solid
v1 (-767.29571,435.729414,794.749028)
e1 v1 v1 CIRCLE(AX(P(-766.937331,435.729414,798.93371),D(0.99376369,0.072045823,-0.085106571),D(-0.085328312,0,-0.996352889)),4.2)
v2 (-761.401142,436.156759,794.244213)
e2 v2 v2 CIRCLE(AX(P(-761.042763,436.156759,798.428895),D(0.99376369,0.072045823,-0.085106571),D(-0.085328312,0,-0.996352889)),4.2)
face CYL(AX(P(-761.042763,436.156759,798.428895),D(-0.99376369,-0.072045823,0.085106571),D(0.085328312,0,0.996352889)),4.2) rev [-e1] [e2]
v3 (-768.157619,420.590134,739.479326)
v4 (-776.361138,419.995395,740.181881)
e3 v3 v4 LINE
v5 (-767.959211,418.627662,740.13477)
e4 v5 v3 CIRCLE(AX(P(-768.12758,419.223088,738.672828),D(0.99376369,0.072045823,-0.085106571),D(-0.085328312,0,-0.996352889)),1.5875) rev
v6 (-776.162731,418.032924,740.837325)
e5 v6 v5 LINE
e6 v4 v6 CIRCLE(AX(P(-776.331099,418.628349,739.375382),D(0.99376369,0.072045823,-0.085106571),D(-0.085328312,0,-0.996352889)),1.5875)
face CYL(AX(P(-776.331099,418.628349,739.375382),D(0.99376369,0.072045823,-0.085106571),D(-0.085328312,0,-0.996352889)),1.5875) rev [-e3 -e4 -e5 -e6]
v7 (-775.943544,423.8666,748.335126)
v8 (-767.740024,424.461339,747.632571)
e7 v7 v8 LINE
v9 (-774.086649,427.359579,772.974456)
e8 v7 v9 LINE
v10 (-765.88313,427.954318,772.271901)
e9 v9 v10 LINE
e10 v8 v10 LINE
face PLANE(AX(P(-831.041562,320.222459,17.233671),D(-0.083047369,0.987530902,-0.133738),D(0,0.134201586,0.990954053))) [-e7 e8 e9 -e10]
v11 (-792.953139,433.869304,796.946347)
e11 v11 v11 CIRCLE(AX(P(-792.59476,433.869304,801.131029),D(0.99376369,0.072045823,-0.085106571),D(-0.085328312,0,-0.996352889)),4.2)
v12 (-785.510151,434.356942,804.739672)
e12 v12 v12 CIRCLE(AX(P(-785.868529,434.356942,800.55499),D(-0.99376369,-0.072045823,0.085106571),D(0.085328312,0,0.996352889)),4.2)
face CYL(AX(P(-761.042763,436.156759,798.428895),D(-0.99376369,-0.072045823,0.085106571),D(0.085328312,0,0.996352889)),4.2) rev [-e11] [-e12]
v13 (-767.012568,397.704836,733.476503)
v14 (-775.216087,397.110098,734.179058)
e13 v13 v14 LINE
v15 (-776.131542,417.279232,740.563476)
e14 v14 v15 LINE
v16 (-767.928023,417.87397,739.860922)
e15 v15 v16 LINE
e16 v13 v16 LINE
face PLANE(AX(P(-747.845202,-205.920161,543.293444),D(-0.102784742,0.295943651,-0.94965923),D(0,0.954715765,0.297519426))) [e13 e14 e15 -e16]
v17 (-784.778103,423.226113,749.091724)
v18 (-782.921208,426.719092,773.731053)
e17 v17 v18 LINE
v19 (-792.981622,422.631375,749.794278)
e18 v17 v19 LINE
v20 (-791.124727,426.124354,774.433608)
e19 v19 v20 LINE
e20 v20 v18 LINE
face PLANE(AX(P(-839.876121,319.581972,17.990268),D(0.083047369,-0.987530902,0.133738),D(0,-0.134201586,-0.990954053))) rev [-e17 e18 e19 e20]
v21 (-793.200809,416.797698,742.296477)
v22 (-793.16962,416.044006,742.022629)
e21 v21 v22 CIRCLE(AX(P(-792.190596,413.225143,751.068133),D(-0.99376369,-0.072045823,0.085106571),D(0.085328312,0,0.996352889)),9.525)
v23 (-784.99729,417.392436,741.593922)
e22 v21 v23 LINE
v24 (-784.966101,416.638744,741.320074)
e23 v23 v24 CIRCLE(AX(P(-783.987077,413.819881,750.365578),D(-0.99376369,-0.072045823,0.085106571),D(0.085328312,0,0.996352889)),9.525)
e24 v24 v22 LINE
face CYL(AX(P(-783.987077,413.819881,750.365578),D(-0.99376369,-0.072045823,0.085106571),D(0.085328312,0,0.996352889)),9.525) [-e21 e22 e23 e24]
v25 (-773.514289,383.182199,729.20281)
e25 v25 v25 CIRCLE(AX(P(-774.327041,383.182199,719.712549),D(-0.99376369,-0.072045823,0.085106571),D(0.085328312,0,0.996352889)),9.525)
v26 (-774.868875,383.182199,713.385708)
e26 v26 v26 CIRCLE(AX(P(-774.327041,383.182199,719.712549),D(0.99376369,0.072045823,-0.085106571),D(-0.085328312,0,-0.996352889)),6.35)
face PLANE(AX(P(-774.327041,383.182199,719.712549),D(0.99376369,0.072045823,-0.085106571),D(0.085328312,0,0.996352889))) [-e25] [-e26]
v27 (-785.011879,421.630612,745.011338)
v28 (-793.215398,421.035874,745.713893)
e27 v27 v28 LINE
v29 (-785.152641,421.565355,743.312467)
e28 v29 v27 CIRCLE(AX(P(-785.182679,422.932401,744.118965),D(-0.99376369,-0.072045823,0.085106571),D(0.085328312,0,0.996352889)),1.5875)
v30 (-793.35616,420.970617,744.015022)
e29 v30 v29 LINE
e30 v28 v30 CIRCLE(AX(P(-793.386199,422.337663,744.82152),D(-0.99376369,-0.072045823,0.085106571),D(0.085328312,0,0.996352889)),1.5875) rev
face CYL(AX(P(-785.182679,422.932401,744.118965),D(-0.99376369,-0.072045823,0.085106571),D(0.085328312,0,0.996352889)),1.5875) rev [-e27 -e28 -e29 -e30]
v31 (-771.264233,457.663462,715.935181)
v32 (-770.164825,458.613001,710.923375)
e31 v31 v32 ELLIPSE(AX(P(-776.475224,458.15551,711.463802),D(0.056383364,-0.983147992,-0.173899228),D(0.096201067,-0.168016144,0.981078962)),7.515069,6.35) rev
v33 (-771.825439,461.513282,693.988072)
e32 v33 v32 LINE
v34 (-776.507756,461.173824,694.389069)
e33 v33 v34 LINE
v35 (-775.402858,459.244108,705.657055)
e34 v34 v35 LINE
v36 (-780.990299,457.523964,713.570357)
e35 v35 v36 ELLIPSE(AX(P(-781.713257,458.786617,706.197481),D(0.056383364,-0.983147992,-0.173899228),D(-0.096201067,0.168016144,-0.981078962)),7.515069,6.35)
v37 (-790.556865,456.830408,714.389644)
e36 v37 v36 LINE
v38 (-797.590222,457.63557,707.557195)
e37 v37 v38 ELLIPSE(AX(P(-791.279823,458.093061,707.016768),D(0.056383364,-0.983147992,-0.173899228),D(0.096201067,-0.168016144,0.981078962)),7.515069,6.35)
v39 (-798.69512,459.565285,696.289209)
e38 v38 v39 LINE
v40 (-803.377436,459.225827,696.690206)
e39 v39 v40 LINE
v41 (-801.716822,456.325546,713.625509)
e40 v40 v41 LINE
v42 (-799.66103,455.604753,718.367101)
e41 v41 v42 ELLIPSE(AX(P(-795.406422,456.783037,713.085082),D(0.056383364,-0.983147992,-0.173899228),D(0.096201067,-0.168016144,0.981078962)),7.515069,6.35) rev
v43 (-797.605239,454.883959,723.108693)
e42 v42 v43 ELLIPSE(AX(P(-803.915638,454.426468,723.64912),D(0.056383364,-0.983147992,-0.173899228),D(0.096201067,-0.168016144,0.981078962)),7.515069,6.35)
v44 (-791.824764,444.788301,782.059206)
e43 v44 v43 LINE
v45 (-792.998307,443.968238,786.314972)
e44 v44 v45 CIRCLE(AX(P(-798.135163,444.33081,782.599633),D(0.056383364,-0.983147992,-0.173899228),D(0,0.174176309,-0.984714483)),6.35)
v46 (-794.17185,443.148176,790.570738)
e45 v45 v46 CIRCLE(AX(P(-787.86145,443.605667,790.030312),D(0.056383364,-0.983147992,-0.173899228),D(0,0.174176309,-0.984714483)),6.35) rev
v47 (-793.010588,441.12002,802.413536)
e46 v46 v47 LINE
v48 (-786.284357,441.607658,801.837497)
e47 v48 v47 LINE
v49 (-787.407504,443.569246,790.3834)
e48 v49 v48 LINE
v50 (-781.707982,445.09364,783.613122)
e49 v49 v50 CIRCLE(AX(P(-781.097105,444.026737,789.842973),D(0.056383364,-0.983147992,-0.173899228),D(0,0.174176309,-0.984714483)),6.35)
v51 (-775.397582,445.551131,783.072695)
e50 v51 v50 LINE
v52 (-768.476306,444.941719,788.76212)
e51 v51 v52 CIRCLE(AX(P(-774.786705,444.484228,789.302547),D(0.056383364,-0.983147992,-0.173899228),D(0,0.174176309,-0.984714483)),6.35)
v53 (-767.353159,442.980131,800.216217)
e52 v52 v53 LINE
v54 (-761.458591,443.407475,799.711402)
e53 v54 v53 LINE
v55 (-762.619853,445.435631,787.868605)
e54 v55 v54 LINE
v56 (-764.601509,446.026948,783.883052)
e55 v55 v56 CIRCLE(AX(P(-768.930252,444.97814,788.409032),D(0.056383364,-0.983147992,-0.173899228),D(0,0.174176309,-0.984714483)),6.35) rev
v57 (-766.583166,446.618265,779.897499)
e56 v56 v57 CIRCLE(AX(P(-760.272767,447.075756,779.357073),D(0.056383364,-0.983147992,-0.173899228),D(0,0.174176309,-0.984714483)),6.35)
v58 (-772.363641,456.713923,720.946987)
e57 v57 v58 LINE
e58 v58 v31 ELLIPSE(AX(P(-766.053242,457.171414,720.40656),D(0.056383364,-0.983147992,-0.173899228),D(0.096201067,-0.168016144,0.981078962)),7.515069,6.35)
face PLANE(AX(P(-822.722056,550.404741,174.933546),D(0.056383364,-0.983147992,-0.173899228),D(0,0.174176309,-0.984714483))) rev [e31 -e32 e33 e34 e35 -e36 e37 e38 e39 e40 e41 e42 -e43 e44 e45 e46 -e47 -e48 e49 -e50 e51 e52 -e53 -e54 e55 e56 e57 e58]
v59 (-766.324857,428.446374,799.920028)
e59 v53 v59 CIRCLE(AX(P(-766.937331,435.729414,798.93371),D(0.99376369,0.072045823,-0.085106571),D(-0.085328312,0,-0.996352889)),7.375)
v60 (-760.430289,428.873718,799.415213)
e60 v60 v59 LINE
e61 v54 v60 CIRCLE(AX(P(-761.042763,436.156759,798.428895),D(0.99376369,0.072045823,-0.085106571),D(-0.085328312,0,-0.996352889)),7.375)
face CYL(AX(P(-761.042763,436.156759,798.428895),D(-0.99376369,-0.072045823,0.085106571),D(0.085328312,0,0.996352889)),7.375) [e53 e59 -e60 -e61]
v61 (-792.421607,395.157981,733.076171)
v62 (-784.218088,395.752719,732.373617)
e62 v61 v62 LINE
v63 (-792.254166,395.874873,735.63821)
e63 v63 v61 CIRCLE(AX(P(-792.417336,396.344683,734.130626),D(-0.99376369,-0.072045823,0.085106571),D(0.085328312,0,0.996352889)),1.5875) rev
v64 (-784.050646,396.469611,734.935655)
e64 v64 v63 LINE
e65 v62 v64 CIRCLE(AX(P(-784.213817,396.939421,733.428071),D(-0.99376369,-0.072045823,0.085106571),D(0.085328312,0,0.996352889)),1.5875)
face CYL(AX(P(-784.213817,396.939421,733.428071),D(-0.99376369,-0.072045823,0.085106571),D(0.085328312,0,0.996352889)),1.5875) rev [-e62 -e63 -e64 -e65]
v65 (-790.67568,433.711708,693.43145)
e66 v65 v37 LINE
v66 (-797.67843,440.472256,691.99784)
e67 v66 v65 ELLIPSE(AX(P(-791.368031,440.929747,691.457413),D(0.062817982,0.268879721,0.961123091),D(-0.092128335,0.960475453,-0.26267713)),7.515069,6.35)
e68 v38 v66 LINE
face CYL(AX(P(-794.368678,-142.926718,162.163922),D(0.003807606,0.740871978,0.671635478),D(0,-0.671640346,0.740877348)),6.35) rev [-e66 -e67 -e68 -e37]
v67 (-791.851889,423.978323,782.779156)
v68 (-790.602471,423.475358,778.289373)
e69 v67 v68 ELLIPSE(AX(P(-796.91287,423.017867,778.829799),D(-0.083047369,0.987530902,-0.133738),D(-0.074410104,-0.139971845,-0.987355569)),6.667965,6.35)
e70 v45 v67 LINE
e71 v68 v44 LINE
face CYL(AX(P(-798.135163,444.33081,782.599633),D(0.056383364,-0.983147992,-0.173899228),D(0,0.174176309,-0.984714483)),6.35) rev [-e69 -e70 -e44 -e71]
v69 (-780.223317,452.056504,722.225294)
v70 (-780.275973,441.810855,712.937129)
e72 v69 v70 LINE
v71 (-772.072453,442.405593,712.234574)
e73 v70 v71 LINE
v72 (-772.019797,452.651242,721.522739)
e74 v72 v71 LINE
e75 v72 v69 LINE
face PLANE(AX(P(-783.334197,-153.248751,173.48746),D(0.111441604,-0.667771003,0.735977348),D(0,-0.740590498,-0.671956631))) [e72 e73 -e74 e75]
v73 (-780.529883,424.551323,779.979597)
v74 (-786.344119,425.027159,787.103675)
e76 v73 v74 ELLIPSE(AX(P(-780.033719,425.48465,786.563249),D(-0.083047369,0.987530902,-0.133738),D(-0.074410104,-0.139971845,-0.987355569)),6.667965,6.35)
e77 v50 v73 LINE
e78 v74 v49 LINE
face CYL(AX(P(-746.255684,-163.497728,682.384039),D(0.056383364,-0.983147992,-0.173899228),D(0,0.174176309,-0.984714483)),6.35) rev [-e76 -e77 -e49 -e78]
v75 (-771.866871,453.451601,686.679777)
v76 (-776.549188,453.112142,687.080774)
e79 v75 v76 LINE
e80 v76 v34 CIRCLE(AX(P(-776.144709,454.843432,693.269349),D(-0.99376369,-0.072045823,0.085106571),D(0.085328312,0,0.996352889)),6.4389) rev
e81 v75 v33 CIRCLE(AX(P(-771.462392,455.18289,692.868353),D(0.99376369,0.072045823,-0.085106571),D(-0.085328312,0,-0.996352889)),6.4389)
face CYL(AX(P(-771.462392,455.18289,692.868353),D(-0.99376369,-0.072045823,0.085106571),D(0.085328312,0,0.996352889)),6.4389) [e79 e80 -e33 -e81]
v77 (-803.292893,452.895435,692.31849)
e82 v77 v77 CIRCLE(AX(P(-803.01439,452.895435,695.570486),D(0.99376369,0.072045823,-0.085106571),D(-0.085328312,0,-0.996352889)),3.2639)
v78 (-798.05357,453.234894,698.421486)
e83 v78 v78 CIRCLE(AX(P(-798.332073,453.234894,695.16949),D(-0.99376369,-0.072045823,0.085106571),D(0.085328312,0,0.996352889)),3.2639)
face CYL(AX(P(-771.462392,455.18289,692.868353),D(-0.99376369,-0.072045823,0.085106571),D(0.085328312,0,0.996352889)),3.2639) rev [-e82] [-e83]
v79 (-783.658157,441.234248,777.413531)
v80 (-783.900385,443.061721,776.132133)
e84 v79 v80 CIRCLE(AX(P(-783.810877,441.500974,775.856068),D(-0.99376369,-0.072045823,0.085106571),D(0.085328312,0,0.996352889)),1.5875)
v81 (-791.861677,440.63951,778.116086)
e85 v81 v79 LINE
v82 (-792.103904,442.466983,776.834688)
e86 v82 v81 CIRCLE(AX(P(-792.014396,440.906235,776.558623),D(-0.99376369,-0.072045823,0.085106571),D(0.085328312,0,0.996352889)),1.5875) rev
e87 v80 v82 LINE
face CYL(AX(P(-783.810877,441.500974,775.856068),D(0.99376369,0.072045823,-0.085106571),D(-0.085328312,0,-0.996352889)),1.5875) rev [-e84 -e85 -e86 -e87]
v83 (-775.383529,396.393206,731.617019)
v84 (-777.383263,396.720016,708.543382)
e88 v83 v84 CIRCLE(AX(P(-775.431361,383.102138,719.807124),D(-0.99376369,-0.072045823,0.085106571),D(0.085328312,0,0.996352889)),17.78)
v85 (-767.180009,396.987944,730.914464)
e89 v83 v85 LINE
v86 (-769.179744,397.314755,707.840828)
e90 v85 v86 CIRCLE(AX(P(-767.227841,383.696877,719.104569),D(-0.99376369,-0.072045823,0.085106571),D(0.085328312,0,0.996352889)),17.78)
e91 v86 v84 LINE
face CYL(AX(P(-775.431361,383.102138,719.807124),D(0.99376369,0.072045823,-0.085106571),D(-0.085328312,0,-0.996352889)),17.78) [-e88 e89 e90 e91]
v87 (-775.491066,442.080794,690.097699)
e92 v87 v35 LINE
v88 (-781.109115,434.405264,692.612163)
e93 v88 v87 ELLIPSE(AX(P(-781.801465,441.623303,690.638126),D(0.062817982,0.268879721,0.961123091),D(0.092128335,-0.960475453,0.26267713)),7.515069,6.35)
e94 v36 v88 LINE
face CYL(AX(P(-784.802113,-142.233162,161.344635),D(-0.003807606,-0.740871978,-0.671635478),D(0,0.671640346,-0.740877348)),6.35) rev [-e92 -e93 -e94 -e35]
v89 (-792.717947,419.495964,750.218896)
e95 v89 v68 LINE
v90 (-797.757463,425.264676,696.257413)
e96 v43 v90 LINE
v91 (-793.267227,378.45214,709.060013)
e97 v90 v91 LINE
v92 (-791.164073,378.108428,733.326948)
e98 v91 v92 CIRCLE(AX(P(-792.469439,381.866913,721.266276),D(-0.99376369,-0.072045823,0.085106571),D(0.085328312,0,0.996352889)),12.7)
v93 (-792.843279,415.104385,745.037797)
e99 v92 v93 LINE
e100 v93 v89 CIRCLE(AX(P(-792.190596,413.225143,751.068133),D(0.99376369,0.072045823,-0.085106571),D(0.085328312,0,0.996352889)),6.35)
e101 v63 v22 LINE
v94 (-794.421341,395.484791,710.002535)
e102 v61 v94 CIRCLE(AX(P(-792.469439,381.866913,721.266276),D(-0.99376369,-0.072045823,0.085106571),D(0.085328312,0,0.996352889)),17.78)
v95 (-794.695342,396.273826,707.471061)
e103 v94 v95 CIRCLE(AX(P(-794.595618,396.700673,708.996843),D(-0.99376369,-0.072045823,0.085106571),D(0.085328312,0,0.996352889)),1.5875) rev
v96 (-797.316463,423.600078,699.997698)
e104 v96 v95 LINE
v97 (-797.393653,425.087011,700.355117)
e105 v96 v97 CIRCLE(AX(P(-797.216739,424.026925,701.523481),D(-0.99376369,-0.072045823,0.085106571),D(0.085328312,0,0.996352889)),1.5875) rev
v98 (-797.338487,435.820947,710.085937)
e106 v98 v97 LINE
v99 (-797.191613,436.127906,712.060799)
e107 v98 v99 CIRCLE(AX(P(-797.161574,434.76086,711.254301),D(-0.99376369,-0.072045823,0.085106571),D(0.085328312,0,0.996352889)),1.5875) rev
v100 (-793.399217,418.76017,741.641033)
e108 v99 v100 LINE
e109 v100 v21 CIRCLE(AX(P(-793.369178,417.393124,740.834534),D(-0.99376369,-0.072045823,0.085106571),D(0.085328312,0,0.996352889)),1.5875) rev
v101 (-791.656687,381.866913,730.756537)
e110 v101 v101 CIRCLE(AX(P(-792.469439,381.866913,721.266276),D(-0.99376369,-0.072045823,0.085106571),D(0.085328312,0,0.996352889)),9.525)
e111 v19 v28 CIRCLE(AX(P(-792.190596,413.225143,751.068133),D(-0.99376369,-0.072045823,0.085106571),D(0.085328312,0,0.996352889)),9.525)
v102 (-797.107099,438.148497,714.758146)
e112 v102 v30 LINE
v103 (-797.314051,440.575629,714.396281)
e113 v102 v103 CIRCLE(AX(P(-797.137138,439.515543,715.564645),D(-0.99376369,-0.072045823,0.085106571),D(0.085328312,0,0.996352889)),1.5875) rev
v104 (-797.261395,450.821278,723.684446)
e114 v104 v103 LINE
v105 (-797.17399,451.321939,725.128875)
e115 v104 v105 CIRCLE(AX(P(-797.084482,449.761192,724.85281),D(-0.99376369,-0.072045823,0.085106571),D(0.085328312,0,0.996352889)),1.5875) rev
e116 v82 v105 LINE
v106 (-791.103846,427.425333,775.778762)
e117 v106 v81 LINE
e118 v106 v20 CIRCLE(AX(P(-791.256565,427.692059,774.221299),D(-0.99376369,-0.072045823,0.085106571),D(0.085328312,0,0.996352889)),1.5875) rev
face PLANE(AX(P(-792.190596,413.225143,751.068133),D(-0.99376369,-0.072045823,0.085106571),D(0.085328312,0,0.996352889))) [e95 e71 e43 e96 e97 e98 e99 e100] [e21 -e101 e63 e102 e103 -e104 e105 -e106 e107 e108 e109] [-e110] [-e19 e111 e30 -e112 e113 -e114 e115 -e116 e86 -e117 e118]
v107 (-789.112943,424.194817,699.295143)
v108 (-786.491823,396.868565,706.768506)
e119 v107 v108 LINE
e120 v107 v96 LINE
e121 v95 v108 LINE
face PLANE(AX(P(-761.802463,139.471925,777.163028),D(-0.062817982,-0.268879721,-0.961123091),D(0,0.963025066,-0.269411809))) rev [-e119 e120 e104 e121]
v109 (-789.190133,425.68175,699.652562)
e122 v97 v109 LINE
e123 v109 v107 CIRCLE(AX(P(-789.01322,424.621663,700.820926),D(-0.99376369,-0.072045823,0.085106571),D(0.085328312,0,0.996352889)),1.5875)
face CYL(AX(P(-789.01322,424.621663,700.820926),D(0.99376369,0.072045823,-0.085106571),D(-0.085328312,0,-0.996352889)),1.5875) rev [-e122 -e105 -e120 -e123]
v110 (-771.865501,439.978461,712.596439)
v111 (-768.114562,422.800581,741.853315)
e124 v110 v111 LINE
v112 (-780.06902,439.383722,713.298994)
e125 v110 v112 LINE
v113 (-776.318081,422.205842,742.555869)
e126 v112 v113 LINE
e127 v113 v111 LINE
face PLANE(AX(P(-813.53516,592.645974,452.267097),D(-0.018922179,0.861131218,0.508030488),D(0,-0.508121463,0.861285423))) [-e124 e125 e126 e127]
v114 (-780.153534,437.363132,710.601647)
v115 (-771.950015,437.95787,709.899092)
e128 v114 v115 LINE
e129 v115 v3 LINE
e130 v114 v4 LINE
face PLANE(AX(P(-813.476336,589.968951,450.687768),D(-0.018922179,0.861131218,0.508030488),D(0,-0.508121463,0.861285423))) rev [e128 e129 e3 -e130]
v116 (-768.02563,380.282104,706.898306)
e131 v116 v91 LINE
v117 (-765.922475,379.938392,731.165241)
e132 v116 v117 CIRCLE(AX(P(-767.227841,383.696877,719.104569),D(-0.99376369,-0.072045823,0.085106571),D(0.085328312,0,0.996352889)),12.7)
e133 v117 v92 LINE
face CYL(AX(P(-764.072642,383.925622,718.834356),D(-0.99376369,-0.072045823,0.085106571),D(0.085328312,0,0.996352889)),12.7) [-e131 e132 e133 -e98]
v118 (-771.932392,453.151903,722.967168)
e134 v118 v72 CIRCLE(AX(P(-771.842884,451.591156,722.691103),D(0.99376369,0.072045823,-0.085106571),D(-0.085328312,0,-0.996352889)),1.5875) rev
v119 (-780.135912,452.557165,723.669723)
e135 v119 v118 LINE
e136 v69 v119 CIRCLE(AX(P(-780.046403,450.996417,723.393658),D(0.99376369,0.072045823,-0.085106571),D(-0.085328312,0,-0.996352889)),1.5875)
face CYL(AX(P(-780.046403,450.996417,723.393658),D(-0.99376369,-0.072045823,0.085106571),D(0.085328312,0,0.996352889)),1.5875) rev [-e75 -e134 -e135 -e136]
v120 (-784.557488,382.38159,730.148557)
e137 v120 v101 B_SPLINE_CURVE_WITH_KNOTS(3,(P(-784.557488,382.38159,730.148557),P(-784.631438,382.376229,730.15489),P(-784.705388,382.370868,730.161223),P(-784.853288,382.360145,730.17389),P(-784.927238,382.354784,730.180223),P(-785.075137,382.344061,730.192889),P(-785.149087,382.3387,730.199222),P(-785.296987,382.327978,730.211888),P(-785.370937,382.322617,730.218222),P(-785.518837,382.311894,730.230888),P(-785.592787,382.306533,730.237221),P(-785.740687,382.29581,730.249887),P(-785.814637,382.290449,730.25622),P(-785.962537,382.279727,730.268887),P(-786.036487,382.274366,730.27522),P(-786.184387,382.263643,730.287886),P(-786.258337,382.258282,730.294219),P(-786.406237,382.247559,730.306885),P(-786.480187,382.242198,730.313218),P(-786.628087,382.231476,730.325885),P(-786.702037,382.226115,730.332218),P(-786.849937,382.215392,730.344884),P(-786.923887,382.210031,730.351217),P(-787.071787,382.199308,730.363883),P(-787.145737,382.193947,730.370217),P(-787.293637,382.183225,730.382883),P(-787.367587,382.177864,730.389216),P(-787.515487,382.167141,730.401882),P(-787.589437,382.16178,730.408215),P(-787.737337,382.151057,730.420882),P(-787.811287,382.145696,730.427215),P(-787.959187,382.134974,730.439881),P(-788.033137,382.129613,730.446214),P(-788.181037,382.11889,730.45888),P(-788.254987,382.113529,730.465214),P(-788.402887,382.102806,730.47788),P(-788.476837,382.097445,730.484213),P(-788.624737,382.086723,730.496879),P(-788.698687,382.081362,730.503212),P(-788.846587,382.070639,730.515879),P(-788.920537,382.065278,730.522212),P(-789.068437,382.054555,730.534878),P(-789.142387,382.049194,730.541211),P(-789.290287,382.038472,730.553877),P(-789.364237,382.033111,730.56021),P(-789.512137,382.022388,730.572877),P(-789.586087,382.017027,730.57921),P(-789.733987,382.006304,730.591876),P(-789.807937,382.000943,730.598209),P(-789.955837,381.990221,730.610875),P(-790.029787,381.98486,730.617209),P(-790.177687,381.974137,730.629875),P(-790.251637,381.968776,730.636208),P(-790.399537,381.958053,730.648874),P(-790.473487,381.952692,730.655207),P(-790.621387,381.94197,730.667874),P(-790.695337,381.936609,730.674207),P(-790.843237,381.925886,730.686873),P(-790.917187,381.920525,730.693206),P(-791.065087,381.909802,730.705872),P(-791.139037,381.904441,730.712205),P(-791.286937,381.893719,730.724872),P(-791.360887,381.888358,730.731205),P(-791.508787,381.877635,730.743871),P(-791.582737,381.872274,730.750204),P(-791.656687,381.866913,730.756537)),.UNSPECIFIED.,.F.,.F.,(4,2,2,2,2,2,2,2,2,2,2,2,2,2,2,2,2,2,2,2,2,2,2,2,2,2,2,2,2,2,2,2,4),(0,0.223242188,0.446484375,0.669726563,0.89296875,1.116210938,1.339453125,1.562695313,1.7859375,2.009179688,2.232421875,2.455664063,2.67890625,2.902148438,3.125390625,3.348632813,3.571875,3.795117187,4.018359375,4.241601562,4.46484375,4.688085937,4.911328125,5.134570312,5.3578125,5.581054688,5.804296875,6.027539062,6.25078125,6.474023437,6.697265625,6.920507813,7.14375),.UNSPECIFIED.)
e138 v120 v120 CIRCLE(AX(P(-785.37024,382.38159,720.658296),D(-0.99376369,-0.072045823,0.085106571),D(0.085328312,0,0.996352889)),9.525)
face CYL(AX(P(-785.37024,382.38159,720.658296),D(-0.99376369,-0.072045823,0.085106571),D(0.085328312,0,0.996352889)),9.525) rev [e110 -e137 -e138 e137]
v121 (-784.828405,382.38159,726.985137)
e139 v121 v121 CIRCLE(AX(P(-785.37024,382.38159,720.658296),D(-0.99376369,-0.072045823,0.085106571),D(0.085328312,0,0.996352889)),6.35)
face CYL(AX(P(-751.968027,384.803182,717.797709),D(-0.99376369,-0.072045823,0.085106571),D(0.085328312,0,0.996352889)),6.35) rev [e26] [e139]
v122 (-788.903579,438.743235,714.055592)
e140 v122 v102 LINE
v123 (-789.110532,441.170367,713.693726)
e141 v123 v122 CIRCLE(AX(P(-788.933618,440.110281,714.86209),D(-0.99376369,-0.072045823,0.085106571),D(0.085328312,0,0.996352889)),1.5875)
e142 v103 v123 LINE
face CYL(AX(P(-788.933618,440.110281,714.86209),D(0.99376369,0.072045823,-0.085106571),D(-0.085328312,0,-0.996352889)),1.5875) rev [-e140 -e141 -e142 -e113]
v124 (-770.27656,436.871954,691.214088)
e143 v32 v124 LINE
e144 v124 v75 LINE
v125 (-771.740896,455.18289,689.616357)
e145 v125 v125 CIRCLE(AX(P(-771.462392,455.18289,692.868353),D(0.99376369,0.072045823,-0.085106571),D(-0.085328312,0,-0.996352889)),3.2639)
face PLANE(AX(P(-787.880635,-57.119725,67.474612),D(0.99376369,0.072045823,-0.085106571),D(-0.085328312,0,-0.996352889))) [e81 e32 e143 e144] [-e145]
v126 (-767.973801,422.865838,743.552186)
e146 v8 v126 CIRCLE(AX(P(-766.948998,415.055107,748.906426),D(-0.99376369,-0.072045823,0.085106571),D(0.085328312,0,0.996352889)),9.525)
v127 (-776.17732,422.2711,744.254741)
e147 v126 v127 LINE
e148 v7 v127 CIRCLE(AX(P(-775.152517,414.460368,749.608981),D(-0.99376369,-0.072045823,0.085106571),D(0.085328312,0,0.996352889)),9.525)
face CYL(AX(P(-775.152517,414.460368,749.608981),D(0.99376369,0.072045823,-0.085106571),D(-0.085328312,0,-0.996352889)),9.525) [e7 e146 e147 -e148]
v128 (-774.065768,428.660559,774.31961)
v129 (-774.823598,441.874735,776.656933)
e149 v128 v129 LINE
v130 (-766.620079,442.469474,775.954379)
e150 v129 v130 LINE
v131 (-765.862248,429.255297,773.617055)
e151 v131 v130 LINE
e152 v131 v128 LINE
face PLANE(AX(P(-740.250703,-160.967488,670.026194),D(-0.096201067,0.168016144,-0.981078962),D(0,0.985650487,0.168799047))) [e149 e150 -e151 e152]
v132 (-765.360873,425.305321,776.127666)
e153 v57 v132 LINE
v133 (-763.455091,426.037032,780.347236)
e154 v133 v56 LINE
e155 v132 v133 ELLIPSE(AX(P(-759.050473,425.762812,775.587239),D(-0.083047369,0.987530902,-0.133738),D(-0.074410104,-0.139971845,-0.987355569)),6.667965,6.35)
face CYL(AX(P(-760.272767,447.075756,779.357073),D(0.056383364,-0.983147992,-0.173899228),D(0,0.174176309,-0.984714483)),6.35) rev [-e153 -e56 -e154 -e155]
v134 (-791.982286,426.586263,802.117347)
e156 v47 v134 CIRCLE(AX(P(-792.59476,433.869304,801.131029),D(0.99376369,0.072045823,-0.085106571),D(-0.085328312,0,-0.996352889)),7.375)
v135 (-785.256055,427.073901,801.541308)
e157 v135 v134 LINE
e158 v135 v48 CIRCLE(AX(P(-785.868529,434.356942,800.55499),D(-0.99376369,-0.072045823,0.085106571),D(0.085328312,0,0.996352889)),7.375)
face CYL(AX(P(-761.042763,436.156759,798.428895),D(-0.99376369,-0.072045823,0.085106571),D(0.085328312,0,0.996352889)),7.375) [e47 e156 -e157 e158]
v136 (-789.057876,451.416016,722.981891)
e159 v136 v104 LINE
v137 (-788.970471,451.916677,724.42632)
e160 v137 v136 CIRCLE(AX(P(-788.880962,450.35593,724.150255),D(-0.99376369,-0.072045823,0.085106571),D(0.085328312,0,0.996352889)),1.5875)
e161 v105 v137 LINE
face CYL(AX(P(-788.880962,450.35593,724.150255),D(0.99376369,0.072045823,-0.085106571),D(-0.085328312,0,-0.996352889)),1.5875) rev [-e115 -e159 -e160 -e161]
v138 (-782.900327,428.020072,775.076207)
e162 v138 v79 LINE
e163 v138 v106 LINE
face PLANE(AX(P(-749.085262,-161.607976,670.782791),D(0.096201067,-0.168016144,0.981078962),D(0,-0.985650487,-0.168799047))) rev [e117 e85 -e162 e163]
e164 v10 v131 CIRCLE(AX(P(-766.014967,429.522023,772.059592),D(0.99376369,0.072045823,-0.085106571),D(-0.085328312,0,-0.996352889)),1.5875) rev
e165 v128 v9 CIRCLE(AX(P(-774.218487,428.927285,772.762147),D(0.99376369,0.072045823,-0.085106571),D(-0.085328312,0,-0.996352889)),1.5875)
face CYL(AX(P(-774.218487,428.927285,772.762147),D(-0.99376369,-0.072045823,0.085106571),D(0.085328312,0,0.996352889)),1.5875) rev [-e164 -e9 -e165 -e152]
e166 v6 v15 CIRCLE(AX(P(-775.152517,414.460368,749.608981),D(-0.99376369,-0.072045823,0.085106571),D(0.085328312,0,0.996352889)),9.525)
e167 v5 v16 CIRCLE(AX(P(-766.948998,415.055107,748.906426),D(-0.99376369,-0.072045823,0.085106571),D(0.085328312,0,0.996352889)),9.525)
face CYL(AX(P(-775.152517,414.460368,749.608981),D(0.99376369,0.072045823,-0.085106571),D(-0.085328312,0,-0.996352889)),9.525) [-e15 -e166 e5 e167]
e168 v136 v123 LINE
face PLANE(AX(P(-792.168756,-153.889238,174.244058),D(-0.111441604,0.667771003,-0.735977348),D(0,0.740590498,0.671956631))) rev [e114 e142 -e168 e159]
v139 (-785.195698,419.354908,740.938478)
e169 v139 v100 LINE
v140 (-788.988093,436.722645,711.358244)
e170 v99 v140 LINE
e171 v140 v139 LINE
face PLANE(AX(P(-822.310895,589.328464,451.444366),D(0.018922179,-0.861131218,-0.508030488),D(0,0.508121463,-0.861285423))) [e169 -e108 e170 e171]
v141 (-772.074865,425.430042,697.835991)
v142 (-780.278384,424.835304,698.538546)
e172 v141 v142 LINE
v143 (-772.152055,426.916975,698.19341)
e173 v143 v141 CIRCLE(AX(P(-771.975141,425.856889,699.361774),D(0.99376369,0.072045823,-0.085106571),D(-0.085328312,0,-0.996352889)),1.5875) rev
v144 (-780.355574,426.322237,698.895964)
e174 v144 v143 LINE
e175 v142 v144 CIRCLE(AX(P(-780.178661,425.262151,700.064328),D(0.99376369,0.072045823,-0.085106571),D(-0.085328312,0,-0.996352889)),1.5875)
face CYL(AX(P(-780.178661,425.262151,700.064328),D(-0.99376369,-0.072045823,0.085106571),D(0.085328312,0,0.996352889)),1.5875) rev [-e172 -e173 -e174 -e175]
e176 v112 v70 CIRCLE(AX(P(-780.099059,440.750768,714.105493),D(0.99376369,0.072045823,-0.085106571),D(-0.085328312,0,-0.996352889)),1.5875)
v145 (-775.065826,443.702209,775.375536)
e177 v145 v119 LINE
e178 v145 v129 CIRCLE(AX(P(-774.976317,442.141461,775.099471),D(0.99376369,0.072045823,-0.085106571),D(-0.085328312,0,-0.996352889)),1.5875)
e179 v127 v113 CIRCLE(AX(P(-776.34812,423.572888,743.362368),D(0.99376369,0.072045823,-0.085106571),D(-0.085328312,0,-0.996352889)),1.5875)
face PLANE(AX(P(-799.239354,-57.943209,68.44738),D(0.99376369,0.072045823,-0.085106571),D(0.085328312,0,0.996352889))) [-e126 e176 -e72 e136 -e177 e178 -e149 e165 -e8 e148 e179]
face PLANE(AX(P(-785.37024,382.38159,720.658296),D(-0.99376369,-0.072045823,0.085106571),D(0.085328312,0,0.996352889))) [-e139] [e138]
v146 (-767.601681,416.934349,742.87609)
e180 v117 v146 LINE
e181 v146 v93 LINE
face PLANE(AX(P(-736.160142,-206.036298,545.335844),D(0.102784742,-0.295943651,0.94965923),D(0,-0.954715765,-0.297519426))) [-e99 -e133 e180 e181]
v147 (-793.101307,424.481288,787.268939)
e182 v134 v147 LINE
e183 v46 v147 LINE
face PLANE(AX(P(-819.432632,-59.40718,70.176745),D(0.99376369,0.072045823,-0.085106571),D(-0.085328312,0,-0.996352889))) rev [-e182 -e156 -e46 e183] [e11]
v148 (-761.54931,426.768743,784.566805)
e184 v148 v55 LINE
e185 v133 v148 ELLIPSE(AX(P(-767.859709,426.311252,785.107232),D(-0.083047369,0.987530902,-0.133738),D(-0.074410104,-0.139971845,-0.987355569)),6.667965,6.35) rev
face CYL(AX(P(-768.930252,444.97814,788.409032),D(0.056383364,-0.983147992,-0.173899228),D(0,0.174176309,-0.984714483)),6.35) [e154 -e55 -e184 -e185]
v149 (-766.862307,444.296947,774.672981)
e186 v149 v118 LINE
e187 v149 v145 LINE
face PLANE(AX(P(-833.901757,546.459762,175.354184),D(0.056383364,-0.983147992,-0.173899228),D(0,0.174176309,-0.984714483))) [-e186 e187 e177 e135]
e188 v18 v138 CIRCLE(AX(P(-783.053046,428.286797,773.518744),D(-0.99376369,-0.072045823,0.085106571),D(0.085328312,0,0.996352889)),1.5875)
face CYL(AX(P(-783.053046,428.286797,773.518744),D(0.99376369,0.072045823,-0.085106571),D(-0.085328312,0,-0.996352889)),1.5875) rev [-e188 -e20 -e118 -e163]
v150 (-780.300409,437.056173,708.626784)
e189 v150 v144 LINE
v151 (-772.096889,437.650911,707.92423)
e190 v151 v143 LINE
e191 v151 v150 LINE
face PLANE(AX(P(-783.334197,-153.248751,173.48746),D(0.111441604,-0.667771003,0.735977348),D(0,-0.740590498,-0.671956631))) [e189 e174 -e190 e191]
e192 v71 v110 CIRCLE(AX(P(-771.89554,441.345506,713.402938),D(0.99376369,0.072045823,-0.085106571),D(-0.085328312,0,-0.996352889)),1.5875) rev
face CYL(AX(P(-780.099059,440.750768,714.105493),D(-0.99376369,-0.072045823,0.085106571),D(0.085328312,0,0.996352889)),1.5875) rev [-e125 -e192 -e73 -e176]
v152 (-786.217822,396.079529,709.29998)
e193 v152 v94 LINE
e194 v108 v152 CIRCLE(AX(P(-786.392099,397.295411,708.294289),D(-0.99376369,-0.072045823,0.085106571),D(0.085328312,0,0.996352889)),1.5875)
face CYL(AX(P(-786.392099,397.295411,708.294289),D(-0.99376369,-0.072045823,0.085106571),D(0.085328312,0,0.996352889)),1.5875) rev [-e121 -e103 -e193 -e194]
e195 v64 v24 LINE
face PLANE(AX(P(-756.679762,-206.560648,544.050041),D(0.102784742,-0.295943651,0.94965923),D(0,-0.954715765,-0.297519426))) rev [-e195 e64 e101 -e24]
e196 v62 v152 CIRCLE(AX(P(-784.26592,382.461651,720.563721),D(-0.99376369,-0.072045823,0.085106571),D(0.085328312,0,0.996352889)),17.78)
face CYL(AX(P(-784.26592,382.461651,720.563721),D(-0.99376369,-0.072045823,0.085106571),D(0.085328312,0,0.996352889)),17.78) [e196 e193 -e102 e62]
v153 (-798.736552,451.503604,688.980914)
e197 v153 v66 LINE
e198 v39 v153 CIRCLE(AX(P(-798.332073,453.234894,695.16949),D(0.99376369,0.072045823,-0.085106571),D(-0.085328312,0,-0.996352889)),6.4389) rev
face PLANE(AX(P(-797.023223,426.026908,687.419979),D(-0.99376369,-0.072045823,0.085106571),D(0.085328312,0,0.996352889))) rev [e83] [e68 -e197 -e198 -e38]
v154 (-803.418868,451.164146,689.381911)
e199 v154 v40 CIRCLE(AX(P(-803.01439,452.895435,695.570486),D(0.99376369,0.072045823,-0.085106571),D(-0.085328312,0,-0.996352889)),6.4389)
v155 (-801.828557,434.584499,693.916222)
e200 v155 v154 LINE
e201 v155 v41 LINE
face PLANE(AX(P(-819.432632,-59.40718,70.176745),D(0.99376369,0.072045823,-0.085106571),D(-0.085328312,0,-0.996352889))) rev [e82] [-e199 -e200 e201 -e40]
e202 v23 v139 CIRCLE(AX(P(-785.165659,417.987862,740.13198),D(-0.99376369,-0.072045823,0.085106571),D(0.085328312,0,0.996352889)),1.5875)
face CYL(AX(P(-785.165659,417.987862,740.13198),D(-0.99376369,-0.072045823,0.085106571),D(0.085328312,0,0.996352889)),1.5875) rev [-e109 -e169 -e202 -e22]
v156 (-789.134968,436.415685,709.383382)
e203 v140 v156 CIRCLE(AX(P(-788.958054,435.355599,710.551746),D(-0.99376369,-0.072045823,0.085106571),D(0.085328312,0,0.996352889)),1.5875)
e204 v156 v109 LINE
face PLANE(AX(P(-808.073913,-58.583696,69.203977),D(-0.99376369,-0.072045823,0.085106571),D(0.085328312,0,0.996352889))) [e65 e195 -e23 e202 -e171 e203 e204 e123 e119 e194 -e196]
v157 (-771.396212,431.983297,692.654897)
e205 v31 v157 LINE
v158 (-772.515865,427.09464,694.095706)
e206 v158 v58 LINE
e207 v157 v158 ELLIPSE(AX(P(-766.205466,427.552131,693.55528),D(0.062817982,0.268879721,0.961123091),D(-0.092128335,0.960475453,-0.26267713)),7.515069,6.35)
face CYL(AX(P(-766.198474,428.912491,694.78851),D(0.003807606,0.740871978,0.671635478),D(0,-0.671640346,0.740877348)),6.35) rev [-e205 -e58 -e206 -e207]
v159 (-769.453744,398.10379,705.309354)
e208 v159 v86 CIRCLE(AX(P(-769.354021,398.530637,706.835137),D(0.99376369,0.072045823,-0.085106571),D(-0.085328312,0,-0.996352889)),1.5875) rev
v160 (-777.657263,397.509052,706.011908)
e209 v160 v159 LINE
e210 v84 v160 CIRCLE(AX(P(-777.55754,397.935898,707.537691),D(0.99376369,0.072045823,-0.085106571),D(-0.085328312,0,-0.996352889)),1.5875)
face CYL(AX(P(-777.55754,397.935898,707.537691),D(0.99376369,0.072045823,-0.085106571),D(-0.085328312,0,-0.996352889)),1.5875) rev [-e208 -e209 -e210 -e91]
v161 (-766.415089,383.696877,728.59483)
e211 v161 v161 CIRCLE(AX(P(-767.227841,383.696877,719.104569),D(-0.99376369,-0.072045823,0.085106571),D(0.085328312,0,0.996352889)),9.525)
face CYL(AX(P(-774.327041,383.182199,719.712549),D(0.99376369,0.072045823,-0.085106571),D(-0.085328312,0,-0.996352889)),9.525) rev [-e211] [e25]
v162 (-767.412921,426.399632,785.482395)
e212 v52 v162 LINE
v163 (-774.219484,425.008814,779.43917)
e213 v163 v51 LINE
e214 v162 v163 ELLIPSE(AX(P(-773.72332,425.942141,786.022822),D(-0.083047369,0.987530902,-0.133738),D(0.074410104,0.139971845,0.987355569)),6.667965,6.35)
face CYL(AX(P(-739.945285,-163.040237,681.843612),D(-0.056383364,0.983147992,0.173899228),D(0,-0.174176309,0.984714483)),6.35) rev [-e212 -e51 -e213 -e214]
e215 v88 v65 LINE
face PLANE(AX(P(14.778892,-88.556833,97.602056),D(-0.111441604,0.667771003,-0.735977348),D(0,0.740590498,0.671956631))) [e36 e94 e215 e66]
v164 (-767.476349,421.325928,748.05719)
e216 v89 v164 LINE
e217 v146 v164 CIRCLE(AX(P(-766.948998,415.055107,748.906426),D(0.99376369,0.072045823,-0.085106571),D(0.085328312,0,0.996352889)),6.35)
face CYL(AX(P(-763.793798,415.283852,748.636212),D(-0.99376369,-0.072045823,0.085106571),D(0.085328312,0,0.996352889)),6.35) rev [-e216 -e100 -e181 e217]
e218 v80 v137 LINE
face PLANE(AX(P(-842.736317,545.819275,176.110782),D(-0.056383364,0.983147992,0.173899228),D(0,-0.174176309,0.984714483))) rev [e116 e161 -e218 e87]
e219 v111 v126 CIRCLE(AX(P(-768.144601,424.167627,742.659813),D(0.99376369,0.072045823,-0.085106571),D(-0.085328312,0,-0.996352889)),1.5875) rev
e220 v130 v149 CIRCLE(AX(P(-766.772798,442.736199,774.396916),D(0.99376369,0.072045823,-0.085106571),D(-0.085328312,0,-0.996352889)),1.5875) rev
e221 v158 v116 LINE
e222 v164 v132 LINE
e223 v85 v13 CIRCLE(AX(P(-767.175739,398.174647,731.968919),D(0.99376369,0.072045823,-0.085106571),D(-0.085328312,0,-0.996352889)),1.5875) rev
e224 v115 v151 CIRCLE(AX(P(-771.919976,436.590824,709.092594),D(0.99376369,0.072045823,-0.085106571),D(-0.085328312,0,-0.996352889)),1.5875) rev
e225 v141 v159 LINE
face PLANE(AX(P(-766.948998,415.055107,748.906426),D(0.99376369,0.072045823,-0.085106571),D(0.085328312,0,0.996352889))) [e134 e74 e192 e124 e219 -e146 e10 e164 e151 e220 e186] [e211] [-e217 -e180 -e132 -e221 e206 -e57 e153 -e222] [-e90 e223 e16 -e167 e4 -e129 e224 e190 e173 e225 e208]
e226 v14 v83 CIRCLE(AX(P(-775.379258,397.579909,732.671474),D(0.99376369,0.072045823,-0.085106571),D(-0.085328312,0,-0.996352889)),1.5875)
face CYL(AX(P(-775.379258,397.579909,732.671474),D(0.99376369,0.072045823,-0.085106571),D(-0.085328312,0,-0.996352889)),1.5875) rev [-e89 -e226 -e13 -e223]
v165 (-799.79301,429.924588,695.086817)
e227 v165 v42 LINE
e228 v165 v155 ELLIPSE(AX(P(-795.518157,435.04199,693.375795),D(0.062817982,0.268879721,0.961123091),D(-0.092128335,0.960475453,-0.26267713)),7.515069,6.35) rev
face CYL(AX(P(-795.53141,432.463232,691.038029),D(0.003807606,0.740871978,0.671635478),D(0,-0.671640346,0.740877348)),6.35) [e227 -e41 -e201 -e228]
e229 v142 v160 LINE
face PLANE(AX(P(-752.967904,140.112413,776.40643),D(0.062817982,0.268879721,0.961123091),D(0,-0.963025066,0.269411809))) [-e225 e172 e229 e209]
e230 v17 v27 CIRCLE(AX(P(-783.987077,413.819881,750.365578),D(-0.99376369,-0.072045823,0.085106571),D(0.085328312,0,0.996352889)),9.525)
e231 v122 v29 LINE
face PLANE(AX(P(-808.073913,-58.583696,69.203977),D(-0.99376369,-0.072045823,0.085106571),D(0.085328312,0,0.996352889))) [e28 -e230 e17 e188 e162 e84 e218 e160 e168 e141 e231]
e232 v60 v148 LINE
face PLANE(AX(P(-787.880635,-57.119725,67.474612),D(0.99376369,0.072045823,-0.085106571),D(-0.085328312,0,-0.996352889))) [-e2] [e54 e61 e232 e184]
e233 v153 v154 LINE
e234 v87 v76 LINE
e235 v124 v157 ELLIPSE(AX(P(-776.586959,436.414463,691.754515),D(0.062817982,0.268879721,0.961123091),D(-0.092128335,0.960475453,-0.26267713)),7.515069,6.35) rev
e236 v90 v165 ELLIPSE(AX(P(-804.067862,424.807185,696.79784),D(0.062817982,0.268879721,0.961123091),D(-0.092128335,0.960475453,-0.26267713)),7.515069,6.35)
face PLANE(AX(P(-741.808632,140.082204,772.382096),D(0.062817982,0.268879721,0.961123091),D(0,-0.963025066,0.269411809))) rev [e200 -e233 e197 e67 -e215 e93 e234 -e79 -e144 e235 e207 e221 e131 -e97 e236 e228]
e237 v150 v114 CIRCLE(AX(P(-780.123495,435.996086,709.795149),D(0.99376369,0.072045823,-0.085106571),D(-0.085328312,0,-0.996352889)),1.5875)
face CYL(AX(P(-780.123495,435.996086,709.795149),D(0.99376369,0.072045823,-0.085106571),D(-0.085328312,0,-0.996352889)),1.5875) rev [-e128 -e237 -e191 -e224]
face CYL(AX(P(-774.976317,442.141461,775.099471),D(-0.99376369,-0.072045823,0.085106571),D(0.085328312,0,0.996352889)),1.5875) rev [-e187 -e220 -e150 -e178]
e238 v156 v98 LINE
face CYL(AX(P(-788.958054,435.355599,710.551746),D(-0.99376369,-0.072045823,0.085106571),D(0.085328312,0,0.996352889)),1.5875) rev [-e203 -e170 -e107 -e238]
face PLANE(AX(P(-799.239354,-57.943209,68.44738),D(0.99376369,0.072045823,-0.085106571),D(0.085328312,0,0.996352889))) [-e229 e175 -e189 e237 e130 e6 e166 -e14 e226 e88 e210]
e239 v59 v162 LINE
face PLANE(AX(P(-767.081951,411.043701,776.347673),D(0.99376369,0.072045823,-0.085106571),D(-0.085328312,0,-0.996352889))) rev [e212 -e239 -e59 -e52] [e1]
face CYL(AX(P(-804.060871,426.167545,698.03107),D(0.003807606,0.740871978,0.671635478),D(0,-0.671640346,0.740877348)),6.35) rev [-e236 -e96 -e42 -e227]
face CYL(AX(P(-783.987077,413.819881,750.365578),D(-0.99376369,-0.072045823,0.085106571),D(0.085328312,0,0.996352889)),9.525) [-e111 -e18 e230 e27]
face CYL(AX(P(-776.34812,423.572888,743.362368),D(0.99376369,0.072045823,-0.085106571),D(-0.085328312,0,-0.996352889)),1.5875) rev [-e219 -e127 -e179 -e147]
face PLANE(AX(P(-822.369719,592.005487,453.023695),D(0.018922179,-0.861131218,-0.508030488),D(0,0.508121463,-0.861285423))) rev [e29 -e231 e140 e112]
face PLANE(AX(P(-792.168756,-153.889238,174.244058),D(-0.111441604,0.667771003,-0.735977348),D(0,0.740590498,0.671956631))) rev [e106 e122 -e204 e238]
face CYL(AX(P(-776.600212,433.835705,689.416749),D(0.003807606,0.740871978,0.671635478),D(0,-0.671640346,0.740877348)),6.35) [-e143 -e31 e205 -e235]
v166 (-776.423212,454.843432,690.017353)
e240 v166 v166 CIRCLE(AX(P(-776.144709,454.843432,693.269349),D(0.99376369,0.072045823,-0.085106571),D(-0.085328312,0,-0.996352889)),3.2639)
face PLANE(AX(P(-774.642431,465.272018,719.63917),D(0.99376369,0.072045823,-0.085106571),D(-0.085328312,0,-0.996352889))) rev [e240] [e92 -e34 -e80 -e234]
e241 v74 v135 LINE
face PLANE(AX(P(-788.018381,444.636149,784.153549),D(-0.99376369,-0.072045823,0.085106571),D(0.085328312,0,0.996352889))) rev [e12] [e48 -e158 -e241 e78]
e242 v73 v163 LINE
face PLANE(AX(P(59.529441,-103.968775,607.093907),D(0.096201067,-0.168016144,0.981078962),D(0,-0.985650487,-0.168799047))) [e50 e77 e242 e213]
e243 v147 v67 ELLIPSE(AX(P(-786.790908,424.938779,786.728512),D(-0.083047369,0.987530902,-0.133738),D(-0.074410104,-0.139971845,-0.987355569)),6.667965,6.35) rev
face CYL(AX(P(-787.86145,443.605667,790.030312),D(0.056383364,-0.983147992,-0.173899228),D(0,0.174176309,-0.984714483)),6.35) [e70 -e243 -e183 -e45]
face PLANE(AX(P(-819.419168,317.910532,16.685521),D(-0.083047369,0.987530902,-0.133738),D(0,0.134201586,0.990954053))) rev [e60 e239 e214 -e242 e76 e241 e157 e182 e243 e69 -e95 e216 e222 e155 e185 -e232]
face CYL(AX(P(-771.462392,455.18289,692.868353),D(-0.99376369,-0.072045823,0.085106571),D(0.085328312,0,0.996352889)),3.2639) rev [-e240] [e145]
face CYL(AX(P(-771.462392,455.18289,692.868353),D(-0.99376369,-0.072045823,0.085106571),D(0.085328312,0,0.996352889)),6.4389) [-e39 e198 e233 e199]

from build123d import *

# Parameters (mm, degrees)
SKETCH1_R                      = 3.263900000000121
SKETCH1_R_2                    = 4.199999999999976
BOSS_EXTRUDE1_DEPTH            = 15.875
FILLET7_R                      = 6.35
CUT_EXTRUDE6_DEPTH             = 25.4
FILLET8_R                      = 6.35
CUT_EXTRUDE8_REACH             = 1218.683
CUT_EXTRUDE8_END_RADIUS        = 6.438900000000022
CUT_EXTRUDE8_DIRECTION_2_DEPTH = 16.054722017999996
FILLET9_R                      = 6.35
CUT_EXTRUDE9_DEPTH             = 3.175
FILLET14_R                     = 6.35
FILLET15_R                     = 6.35
FILLET16_R                     = 6.35
FILLET17_R                     = 6.35
SKETCH29_R                     = 9.525000000000018
CUT_EXTRUDE10_DEPTH            = 7.14375
SKETCH30_R                     = 6.349999999999941
CUT_EXTRUDE11_DEPTH            = 906.2428652120986
FILLET18_R                     = 6.35
FILLET19_R                     = 6.35
FILLET20_R                     = 6.35
FILLET21_R                     = 6.35
CUT_EXTRUDE12_DEPTH            = 8.255
FILLET22_R                     = 1.5875


with BuildPart() as part:
    # Sketch1 → Boss-Extrude1 (new, symmetric)
    with BuildSketch(Plane(origin=(-803.6566332789141, -58.26345281012812, 68.82567852426239), x_dir=(-0.08515417095162939, -0.00241614660156225, -0.9963648575723355), z_dir=(0.9937636896807375, 0.07204582335356381, -0.08510657089457987))):
        with BuildLine():
            ThreePointArc((-664.2038450226969, 436.8184776127322), (-651.8745198787159, 427.9178662715624), (-639.8468613838354, 437.2220896073974))
            Line((-639.8468613838348, 437.2220896073972), (-619.5515204929051, 510.40226291213133))
            ThreePointArc((-619.5515204929051, 510.40226291213133), (-620.9838530756886, 516.4455246988489), (-626.8562553144544, 518.4672768094307))
            Line((-626.8562553144544, 518.4672768094307), (-733.0342996841451, 500.0570320892499))
            ThreePointArc((-733.0342996841451, 500.05703208924996), (-739.1483230926673, 492.6676503574812), (-732.7916358037484, 485.48595339028384))
            Line((-732.7916358037484, 485.4859533902838), (-677.0205822251494, 477.71877799538424))
            Line((-677.0205822251494, 477.71877799538424), (-664.2038450226976, 436.81847761273195))
        make_face()
        with Locations(Location((-625.7562257117465, 512.1230378414245, 0), (0, 0, 0.138795824))):
            Circle(SKETCH1_R, mode=Mode.SUBTRACT)
        with Locations(Location((-731.7743456050367, 492.79045512904787, 0), (0, 0, 0.138795824))):
            Circle(SKETCH1_R_2, mode=Mode.SUBTRACT)
    extrude(amount=BOSS_EXTRUDE1_DEPTH, both=True)

    # Fillet7
    fillet7_edges = [part.edges().sort_by_distance(p)[0] for p in [
        (-780.3962698306742, 419.8482713749311, 745.1689599242694),
    ]]
    fillet(fillet7_edges, radius=FILLET7_R)

    # Sketch23 → Cut-Extrude6 (cut)
    with BuildSketch(Plane(origin=(61.972947811989165, -108.23638463445343, 632.0133130126799), x_dir=(0.9953619214294605, 0.016238085990304504, -0.09482072522199067), z_dir=(0.09620106739496219, -0.1680161441472004, 0.9810789621319872))):
        Polygon((-851.4974580179244, 570.6197226277428), (-849.4828619685262, 535.112578894877), (-830.4634507696352, 536.1916978167321), (-832.4780468190336, 571.698841549598), align=None)
    extrude(amount=-CUT_EXTRUDE6_DEPTH, mode=Mode.SUBTRACT)

    # Fillet8
    fillet8_edges = [part.edges().sort_by_distance(p)[0] for p in [
        (-768.4981336258412, 435.73746338308155, 780.7155057686616),
        (-787.4293319142591, 434.3649904481961, 782.3367859442033),
    ]]
    fillet(fillet8_edges, radius=FILLET8_R)

    # Cut-Extrude8: up to this cylinder (the profile starts inside it)
    cut_extrude8_end = Plane(origin=(-787.2383908251443, 454.03916279522144, 694.2194195095605), z_dir=(-0.9937636896807374, -0.0720458233535638, 0.08510657089457985)) * Cylinder(CUT_EXTRUDE8_END_RADIUS, 2451.2438, mode=Mode.PRIVATE)
    # Sketch26 → Cut-Extrude8 (cut, up to the surface)
    with BuildSketch(Plane(origin=(12.989728013299839, -77.83595490095189, 85.78614441110385), x_dir=(-0.993770984048656, -0.07487836809153875, 0.0825376353848), z_dir=(-0.11144160447231, 0.6677710026657366, -0.7359773480151642)), mode=Mode.PRIVATE) as cut_extrude8_sk1:
        Polygon((794.3756771448955, 828.136387084358), (794.5699361916237, 777.3363870843579), (816.8963729530036, 777.4217633111716), (816.7021139062754, 828.2217633111715), align=None)
    cut_extrude8_tool1 = extrude(cut_extrude8_sk1.sketch, amount=CUT_EXTRUDE8_REACH, mode=Mode.PRIVATE) & cut_extrude8_end
    add(cut_extrude8_tool1.solids().sort_by_distance((-787.621991, 456.37034, 691.713663))[0], mode=Mode.SUBTRACT)

    # Sketch26 → Cut-Extrude8 direction 2 (cut)
    with BuildSketch(Plane(origin=(12.989728013299839, -77.83595490095189, 85.78614441110385), x_dir=(-0.993770984048656, -0.07487836809153875, 0.0825376353848), z_dir=(-0.11144160447231, 0.6677710026657366, -0.7359773480151642))):
        Polygon((794.3756771448955, 828.136387084358), (794.5699361916237, 777.3363870843579), (816.8963729530036, 777.4217633111716), (816.7021139062754, 828.2217633111715), align=None)
    extrude(amount=-CUT_EXTRUDE8_DIRECTION_2_DEPTH, mode=Mode.SUBTRACT)

    # Fillet9
    fillet9_edges = [part.edges().sort_by_distance(p)[0] for p in [
        (-796.9266720049268, 444.8135668092432, 704.4509735768399),
        (-774.7393076109009, 446.4221050889288, 702.550833211105),
    ]]
    fillet(fillet9_edges, radius=FILLET9_R)

    # Sketch28 → Cut-Extrude9 (cut)
    with BuildSketch(Plane(origin=(-819.4326318525958, -59.407180255866336, 70.17674533721404), x_dir=(0.08496772843683141, 0.004995311208659764, 0.9963711818344676), z_dir=(-0.9937636896807374, -0.07204582335356427, 0.0851065708945801))):
        with BuildLine():
            Line((627.1625420198034, 485.8765159269481), (651.6049859690769, 512.7230828073026))
            Line((651.6049859690769, 512.7230828073026), (717.0206192545211, 501.2063227964691))
            Line((717.0206192545211, 501.2063227964691), (713.4230156056034, 480.7717977405854))
            Line((713.4230156056034, 480.7717977405854), (682.2365581379875, 476.51067285676993))
            ThreePointArc((682.2365581379875, 476.51067285676993), (679.0046113636374, 475.0752012300429), (677.0416730946137, 472.1336145671395))
            Line((677.0416730946137, 472.1336145671395), (665.3311932697678, 435.0994522969059))
            ThreePointArc((665.3311932697678, 435.0994522969059), (652.9788932558142, 426.23075311845423), (640.9753347674774, 435.5660476702974))
            Line((640.9753347674774, 435.5660476702974), (627.1625420198034, 485.8765159269481))
        make_face()
    cut_extrude9 = extrude(amount=-CUT_EXTRUDE9_DEPTH, mode=Mode.SUBTRACT)

    # Mirror4: Cut-Extrude9 across plane
    add(cut_extrude9.mirror(Plane(origin=(-803.6566332789141, -58.26345281012812, 68.82567852426239), x_dir=(0.08488379068765235, 0.00615390022091489, 0.9963718540738523), z_dir=(0.9937636896807375, 0.07204582335356381, -0.08510657089457987))), mode=Mode.SUBTRACT)

    # Fillet14
    # the kernel refuses this fillet: 6.35 mm, written as the material it takes off along each edge
    with BuildSketch(Plane(origin=(-763.9240545414428, 459.87606491191445, 784.86418850568), x_dir=(-0.9937636896807339, -0.07204582335356931, 0.08510657089461458), z_dir=(0.05638336371836082, -0.9831479922388159, -0.17389922844161387))) as fillet14_piece_1:
        with BuildLine():
            CenterArc((6.350000000000176, -5.499261314031187), FILLET14_R, 120.00000000000045, 60.00000000000114)
            Line((1.7393e-13, -5.499261314031369), (-0.12699999999987513, -5.499261314031325))
            Line((-0.12699999999987513, -5.499261314031325), (-0.12700000000006137, 7.226e-14))
            Line((-0.12700000000006137, 7.226e-14), (3.717e-14, 0.12700000000007206))
            ThreePointArc((3.717e-14, 0.12700000000007206), (1.5875000000000965, 0.12700000000011827), (3.1115000000000648, 0.10998522628065008))
            Line((3.1115000000000648, 0.10998522628065008), (3.17500000000012, -2e-17))
        make_face()
    extrude(amount=48.245103312962, mode=Mode.SUBTRACT)

    # Fillet15
    fillet15_edges = [part.edges().sort_by_distance(p)[0] for p in [
        (-765.7191436523169, 435.93128119402047, 780.9395087471651),
    ]]
    fillet(fillet15_edges, radius=FILLET15_R)

    # Fillet16
    # the kernel refuses this fillet: 6.35 mm, written as the material it takes off along each edge
    with BuildSketch(Plane(origin=(-795.4760516888064, 457.58861002043943, 787.566322131583), x_dir=(0.09620106739496583, -0.1680161441471998, 0.9810789621319869), z_dir=(0.056383363718361654, -0.9831479922388158, -0.17389922844161396))) as fillet16_piece_1:
        with BuildLine():
            CenterArc((5.499261314031349, -6.350000000000004), FILLET16_R, 89.99999999999983, 59.99999999999977)
            Line((2.1372e-13, -3.174999999999983), (-0.10998522628039077, -3.1114999999999853))
            ThreePointArc((-0.10998522628039077, -3.1114999999999853), (-0.1270000000000597, -1.587499999999776), (-0.1270000000000243, 6.167e-14))
            Line((-0.1270000000000243, 6.167e-14), (7.628e-14, 0.12700000000006137))
            Line((7.628e-14, 0.12700000000006137), (5.4992613140314255, 0.12700000000005307))
            Line((5.4992613140314255, 0.12700000000005307), (5.499261314031368, -8e-17))
        make_face()
    extrude(amount=48.24510331296339, mode=Mode.SUBTRACT)

    # Fillet17
    fillet17_edges = [part.edges().sort_by_distance(p)[0] for p in [
        (-790.9607413702078, 434.1013172808399, 783.1012156478874),
    ]]
    fillet(fillet17_edges, radius=FILLET17_R)

    # Sketch29 → Cut-Extrude10 (cut)
    with BuildSketch(Plane(origin=(-816.2774321378596, -59.17843476671879, 69.90653197462376), x_dir=(0.08496772843683141, 0.004995311208659761, 0.9963711818344676), z_dir=(-0.9937636896807374, -0.07204582335356424, 0.0851065708945801))):
        with Locations(Location((653.2221478363805, 438.92842326730624, 0), (0, 0, 359.713042845))):
            Circle(SKETCH29_R)
    cut_extrude10 = extrude(amount=-CUT_EXTRUDE10_DEPTH, mode=Mode.SUBTRACT)

    # Mirror6: Cut-Extrude10 across plane
    add(cut_extrude10.mirror(Plane(origin=(-803.6566332789141, -58.26345281012812, 68.82567852426239), x_dir=(0.08488379068765235, 0.00615390022091489, 0.9963718540738523), z_dir=(0.9937636896807375, 0.07204582335356381, -0.08510657089457987))), mode=Mode.SUBTRACT)

    # Sketch30 → Cut-Extrude11 (cut, through all)
    with BuildSketch(Plane(origin=(-809.1782327797032, -58.663757416136754, 69.29855190879563), x_dir=(0.08496772843683141, 0.004995311208659758, 0.9963711818344676), z_dir=(-0.9937636896807374, -0.07204582335356423, 0.0851065708945801))):
        with Locations(Location((653.2221478363805, 438.9284232673062, 0), (0, 0, 359.713042845))):
            Circle(SKETCH30_R)
    extrude(amount=-CUT_EXTRUDE11_DEPTH, mode=Mode.SUBTRACT)

    # Fillet18
    # the kernel refuses this fillet: 6.35 mm, written as the material it takes off along each edge
    with BuildSketch(Plane(origin=(-801.2813108853807, 418.14787225507484, 686.3920398850967), x_dir=(0.9937636896807204, 0.07204582335366592, -0.08510657089469212), z_dir=(0.00380760617239137, 0.7408719776966206, 0.6716354776209593))) as fillet18_piece_1:
        with BuildLine():
            CenterArc((6.35000000000041, 5.499261314030801), FILLET18_R, 179.99999999999162, 60.0000000000021)
            Line((4.066e-13, 5.499261314031734), (-0.12699999999964662, 5.499261314031687))
            Line((-0.12699999999964662, 5.499261314031687), (-0.12700000000005465, -5.457e-14))
            Line((-0.12700000000005465, -5.457e-14), (-5.076e-14, -0.1269999999999836))
            ThreePointArc((-5.076e-14, -0.1269999999999836), (1.5875000000000143, -0.12700000000015826), (3.111499999999835, -0.10998522628064958))
            Line((3.111499999999835, -0.10998522628064958), (3.1749999999998253, 4e-17))
        make_face()
    extrude(amount=63.8029343325191, mode=Mode.SUBTRACT)

    # Fillet19
    fillet19_edges = [part.edges().sort_by_distance(p)[0] for p in [
        (-798.0046429473542, 442.01152081511304, 707.5479836595266),
    ]]
    fillet(fillet19_edges, radius=FILLET19_R)

    # Fillet20
    # the kernel refuses this fillet: 6.35 mm, written as the material it takes off along each edge
    with BuildSketch(Plane(origin=(-769.7293137380176, 420.4353271465504, 683.6899062591938), x_dir=(-0.11144160447232392, 0.6677710026657372, -0.7359773480151613), z_dir=(0.0038076061723917327, 0.7408719776966206, 0.6716354776209593))) as fillet20_piece_1:
        with BuildLine():
            CenterArc((5.499261314031944, 6.350000000000002), FILLET20_R, 209.99999999999807, 60.000000000001535)
            Line((6.1001e-13, 3.1750000000001637), (-0.10998522627997129, 3.1115000000001984))
            ThreePointArc((-0.10998522627997129, 3.1115000000001984), (-0.1269999999998684, 1.587499999999964), (-0.12699999999996808, 3.003e-14))
            Line((-0.12699999999996808, 3.003e-14), (7.233e-14, -0.12700000000005462))
            Line((7.233e-14, -0.12700000000005462), (5.499261314031964, -0.1270000000000532))
            Line((5.499261314031964, -0.1270000000000532), (5.499261314031899, 2e-17))
        make_face()
    extrude(amount=63.80293433251974, mode=Mode.SUBTRACT)

    # Fillet21
    fillet21_edges = [part.edges().sort_by_distance(p)[0] for p in [
        (-772.7630452294634, 443.8414847282936, 705.3862767588042),
    ]]
    fillet(fillet21_edges, radius=FILLET21_R)

    # Sketch31 → Cut-Extrude12 (cut)
    with BuildSketch(Plane(origin=(-816.2774321378596, -59.17843476671879, 69.90653197462376), x_dir=(0.08496772843683141, 0.00499531120865976, 0.9963711818344676), z_dir=(-0.9937636896807374, -0.07204582335356424, 0.0851065708945801))):
        with BuildLine():
            Line((674.89672333572, 475.06621853047307), (642.8078588238949, 494.0354384472156))
            Line((642.807858823895, 494.0354384472155), (631.5959908804484, 481.7207876200674))
            Line((631.5959908804484, 481.7207876200674), (640.0621753209273, 450.88432237161936))
            ThreePointArc((640.0621753209274, 450.8843223716194), (653.5627042491733, 456.70516147569845), (666.8303845646924, 450.3715125855905))
            Line((666.8303845646924, 450.3715125855905), (674.0144117362669, 473.09085730973936))
            ThreePointArc((674.0144117362669, 473.09085730973936), (674.3993015391981, 474.10366959785017), (674.89672333572, 475.06621853047307))
        make_face()
        with BuildLine():
            Line((656.1572086631237, 508.697810753842), (644.945340719677, 496.3831599266939))
            Line((644.945340719677, 496.3831599266939), (676.9276979560174, 477.47690141298455))
            ThreePointArc((676.9276979560175, 477.47690141298443), (679.2112410996338, 478.9158383382181), (681.806739301328, 479.65644474418536))
            Line((681.806739301328, 479.6564447441853), (707.6795808792585, 483.1915499794374))
            Line((707.6795808792585, 483.1915499794374), (710.4861416611554, 499.1329215743282))
            Line((710.4861416611554, 499.1329215743282), (656.1572086631237, 508.697810753842))
        make_face()
    cut_extrude12 = extrude(amount=-CUT_EXTRUDE12_DEPTH, mode=Mode.SUBTRACT)

    # Mirror7: Cut-Extrude12 across plane
    add(cut_extrude12.mirror(Plane(origin=(-803.6566332789141, -58.26345281012812, 68.82567852426239), x_dir=(0.08488379068765235, 0.00615390022091489, 0.9963718540738523), z_dir=(0.9937636896807375, 0.07204582335356381, -0.08510657089457987))), mode=Mode.SUBTRACT)

    # Fillet22
    fillet22_edges = [part.edges().sort_by_distance(p)[0] for p in [
        (-789.1370396345999, 420.73051927759144, 744.5791420768076),
        (-793.2197196550782, 439.4276482053311, 712.7347253120122),
        (-793.1563076799398, 451.76614995770234, 723.920160538413),
        (-787.8494256367547, 442.4976264112924, 778.0408732089827),
        (-786.9367740043706, 426.58386105891134, 775.226046206104),
        (-788.0377184094101, 393.64546844047766, 734.487097923037),
        (-790.3491820896078, 394.0232236490786, 707.8166191749503),
        (-793.2952207798138, 424.7368779237731, 699.4168474441651),
        (-793.2318088046756, 437.07537967614434, 710.6022826705657),
        (-789.1355326904995, 418.3159857862957, 742.5527473430857),
        (-772.0989611750235, 421.96574491898843, 743.11998991882),
        (-769.8986955447944, 427.8190867003083, 773.7668940481163),
        (-770.8113471771785, 443.7328520526894, 776.581721050995),
        (-776.1182292203634, 453.0013755990992, 722.4610083804254),
        (-776.1816411955019, 440.66287384672796, 711.2755731540245),
        (-773.3111036300314, 395.2584492904755, 706.3574670169627),
        (-770.9996399498339, 394.8806940818746, 733.0279457650495),
        (-772.0974542309233, 419.5512114276926, 741.093595185098),
        (-776.1937303450991, 438.3106053175412, 709.1431305125781),
        (-776.2571423202376, 425.9721035651701, 697.9576952861775),
    ]]
    fillet(fillet22_edges, radius=FILLET22_R)


solid = part.part
